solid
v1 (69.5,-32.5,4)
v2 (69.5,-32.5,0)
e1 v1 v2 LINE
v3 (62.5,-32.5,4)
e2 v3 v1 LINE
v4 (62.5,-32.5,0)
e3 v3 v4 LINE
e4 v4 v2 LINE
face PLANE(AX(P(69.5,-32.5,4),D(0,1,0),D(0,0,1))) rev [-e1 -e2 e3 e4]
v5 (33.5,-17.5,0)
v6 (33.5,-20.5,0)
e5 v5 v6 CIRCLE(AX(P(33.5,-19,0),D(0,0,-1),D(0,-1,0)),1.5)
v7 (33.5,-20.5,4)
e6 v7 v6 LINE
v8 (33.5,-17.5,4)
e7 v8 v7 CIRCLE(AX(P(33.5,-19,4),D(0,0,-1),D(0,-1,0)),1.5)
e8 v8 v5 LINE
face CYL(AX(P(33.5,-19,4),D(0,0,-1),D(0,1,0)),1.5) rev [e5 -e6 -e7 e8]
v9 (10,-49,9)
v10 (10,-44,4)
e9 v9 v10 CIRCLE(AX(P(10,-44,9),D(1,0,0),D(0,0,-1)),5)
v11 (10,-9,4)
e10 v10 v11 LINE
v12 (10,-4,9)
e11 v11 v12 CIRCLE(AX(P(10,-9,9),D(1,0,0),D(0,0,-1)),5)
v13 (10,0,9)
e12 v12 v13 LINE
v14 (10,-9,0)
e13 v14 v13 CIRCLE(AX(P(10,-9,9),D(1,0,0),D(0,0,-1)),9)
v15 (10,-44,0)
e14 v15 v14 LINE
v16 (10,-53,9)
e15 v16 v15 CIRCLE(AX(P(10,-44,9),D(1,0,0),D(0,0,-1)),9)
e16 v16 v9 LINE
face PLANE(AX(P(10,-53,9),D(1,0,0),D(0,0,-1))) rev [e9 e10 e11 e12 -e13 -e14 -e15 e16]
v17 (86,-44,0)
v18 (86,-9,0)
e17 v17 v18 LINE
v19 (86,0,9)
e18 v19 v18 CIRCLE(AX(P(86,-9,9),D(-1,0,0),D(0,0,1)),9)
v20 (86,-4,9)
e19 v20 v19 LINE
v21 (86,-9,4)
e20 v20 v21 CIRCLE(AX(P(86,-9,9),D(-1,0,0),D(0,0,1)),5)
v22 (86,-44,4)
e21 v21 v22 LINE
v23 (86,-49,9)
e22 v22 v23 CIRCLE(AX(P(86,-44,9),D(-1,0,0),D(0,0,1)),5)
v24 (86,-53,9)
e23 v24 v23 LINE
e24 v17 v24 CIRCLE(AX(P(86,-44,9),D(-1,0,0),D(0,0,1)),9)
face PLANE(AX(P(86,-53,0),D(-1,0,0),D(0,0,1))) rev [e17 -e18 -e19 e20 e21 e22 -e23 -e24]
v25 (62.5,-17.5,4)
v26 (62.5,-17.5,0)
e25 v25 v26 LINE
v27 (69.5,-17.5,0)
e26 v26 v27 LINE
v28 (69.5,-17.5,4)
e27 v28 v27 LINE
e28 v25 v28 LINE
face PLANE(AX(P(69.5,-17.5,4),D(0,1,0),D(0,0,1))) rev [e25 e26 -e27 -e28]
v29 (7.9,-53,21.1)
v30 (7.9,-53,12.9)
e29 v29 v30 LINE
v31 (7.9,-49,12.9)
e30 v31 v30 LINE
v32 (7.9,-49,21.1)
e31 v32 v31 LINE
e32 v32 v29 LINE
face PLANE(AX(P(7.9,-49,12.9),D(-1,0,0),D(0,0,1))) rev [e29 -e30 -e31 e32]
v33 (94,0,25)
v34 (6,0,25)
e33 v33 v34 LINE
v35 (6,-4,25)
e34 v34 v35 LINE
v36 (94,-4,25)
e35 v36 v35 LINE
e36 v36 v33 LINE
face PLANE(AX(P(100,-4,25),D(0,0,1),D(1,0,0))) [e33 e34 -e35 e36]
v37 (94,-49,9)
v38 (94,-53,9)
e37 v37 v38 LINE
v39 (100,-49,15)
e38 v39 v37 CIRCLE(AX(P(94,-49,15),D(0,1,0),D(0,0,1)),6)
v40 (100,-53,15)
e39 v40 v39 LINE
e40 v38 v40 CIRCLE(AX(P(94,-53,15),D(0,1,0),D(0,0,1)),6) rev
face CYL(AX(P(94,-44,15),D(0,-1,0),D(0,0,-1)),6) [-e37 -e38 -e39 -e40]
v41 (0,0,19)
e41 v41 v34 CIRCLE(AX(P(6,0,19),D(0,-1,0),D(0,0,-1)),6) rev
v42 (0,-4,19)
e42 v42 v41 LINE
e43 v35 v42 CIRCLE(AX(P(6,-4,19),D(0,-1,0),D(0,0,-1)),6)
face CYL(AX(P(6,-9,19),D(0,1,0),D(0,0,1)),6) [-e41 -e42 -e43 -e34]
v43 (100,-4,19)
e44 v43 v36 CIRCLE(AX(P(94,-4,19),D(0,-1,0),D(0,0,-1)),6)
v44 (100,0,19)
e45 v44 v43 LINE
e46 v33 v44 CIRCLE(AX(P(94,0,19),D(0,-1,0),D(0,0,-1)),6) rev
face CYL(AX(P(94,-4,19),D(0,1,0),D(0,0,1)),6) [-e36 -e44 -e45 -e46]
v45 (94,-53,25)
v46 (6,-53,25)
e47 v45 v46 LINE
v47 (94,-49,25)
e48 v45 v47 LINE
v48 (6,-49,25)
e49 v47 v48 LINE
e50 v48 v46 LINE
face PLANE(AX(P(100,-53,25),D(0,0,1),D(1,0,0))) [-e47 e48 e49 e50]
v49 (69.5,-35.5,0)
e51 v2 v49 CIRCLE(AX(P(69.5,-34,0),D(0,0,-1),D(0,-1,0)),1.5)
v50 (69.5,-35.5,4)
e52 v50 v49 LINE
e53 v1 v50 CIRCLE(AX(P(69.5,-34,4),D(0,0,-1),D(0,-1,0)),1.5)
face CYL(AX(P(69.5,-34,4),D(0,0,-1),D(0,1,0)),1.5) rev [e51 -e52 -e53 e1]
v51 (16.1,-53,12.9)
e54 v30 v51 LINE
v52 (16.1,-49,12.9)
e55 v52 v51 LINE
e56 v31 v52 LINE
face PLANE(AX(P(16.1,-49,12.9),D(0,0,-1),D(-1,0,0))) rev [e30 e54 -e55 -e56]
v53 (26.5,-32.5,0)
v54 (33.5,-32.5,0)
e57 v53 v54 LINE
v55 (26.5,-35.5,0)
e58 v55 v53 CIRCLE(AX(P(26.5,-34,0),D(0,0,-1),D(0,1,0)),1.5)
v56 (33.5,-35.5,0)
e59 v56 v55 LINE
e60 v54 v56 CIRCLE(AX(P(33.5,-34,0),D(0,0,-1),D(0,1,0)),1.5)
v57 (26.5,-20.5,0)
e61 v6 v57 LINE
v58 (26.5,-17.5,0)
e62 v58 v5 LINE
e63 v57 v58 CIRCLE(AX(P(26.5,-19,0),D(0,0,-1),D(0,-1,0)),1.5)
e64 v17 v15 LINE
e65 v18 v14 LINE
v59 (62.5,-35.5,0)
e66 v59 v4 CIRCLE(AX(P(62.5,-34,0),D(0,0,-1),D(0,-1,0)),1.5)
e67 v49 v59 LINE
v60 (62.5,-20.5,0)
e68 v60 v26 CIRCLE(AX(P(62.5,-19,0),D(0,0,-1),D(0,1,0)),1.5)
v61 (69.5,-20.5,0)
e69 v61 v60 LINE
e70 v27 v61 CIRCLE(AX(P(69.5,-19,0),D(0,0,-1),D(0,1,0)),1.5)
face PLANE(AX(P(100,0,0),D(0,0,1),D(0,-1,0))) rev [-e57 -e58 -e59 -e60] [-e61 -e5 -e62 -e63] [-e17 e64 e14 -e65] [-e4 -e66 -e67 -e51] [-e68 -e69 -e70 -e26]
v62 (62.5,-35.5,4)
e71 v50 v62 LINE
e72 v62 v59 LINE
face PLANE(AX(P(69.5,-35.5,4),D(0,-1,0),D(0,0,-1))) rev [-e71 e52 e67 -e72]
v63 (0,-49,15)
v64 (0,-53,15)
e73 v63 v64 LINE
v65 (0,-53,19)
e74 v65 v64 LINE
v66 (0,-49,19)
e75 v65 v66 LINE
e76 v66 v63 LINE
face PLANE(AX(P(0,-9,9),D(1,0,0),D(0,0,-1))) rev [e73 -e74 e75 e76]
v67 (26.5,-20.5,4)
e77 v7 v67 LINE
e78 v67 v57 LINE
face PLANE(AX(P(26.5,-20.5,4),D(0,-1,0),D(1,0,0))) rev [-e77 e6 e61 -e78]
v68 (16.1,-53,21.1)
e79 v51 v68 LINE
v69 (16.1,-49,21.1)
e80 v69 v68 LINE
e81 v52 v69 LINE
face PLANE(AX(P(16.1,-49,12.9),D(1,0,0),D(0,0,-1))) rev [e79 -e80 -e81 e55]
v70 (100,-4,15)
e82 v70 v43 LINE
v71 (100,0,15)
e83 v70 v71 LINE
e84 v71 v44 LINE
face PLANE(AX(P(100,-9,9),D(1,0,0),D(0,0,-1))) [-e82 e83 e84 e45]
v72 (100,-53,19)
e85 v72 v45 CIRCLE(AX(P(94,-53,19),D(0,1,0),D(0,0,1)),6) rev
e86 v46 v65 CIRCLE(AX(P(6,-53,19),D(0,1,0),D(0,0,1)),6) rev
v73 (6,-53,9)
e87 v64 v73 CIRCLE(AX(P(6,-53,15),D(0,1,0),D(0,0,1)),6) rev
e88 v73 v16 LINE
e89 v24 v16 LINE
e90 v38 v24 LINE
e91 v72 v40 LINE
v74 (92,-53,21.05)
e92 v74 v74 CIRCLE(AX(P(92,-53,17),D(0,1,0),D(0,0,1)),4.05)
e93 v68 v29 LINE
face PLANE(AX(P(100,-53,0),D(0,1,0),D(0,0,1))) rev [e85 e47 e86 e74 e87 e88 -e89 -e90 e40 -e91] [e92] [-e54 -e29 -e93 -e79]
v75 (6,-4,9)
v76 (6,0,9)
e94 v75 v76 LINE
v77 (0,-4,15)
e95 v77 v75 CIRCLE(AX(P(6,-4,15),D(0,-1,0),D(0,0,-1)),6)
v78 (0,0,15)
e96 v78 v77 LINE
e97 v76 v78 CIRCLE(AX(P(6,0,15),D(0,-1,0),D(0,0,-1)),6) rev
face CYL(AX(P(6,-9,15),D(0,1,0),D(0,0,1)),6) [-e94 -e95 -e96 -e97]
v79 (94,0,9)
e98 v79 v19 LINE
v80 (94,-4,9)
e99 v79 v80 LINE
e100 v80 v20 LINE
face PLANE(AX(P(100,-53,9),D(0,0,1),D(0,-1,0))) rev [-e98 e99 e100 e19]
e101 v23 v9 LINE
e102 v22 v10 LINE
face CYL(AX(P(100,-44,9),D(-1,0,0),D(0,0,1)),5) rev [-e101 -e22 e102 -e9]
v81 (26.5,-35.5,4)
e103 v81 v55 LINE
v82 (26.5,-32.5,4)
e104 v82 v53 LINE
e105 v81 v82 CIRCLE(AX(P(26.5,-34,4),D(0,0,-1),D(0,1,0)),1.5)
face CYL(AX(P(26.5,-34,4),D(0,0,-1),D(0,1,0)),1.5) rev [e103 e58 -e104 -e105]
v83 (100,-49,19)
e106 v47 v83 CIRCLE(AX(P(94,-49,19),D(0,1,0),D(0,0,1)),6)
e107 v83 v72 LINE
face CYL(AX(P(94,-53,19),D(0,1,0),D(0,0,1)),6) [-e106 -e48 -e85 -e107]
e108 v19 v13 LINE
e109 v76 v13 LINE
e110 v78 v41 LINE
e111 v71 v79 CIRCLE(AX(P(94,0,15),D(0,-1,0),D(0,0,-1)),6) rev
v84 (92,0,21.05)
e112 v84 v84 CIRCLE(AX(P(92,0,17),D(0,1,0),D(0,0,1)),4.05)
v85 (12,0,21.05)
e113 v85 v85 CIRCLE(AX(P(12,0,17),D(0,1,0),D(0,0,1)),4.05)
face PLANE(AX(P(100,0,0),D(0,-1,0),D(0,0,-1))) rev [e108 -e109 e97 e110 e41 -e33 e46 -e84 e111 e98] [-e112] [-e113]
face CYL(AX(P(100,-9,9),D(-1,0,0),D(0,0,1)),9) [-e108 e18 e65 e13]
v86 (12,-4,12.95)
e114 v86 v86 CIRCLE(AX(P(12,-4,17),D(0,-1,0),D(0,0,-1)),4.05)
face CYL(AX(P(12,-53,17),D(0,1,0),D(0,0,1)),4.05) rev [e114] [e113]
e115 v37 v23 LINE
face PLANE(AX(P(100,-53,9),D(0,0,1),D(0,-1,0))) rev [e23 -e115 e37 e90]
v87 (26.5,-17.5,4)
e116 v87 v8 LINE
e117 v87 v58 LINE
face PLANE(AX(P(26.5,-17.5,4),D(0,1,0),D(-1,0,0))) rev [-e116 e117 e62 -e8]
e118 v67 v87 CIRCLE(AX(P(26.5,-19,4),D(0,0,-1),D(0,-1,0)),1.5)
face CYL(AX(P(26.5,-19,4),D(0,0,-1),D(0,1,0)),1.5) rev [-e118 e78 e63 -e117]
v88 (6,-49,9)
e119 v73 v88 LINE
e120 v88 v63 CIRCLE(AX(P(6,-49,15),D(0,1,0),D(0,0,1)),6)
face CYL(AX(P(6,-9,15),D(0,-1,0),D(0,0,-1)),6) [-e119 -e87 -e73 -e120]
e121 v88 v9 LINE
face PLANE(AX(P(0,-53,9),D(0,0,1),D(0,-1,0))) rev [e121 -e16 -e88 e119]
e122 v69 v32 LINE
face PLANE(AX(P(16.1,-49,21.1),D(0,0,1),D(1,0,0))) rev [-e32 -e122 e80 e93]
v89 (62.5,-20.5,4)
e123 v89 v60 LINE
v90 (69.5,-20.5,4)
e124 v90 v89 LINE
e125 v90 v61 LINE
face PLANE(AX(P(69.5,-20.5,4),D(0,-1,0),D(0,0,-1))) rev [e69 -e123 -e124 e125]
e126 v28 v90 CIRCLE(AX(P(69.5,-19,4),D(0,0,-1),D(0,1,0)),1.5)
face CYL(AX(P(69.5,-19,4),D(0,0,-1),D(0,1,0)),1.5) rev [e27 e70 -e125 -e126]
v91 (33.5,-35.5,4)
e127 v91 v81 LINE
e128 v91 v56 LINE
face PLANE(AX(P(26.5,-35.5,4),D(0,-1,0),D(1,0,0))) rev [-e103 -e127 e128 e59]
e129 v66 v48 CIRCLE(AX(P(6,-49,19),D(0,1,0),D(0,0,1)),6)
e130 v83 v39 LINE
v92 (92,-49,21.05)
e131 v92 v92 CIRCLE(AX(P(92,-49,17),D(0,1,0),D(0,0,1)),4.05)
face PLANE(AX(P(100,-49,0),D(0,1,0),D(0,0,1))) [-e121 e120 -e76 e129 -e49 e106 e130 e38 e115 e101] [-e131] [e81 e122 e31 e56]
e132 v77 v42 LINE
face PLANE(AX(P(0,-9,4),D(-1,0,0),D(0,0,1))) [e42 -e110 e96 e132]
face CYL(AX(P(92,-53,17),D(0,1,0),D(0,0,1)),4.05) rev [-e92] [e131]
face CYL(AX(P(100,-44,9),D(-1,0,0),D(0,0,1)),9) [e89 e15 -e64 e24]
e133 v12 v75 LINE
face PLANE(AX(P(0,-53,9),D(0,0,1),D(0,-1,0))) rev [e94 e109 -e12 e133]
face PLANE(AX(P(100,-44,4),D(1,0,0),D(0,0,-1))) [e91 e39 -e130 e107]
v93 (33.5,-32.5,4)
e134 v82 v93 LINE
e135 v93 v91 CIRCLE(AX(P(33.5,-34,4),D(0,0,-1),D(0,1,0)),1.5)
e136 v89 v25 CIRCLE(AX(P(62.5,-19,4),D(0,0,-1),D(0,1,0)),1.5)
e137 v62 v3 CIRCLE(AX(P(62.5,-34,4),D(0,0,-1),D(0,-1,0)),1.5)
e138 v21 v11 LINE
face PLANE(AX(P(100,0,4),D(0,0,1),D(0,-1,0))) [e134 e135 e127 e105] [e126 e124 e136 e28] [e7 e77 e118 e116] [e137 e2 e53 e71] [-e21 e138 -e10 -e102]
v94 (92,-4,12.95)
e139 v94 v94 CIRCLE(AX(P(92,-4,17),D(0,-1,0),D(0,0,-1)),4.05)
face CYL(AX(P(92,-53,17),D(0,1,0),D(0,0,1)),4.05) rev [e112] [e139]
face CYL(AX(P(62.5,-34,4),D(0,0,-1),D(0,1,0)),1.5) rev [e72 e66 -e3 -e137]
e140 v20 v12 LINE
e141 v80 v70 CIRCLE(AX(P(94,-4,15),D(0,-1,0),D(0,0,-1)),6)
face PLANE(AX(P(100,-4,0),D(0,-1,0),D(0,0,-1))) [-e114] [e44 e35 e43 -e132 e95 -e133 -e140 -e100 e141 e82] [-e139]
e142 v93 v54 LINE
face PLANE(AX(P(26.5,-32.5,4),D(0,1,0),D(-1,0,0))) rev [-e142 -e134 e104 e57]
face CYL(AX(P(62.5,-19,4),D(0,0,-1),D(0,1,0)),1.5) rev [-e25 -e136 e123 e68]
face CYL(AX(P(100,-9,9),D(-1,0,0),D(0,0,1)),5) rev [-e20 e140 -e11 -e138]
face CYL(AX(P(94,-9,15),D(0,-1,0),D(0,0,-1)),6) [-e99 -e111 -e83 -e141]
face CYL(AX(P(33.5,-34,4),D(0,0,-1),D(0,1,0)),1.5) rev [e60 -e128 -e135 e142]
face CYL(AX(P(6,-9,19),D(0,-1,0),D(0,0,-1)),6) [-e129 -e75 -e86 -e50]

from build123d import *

# Parameters (mm, degrees)
SM_BASE_FLANGE_1_DEPTH = 100
SKETCH_4_R             = 4.05
CUT_EXTRUDE_1_DEPTH    = 116.905133622
SKETCH_5_W             = 10
SKETCH_5_H             = 9
SKETCH_5_W_2           = 14
CUT_EXTRUDE_2_DEPTH    = 116.905133622
FILLET_1_R             = 6
SKETCH_7_W             = 8.2
SKETCH_7_H             = 8.2
CUT_EXTRUDE_4_DEPTH    = 4
CUT_EXTRUDE_5_DEPTH    = 4


# Sheet-metal steps are written as plain solids
with BuildPart() as part:
    # Sketch 1 → Базовая кромка1 (new body)
    with BuildSketch(Plane(origin=(0, 0, 0), x_dir=(0, 0, -1), z_dir=(1, 0, 0))):
        with BuildLine():
            Line((-25, -53), (-9, -53))
            ThreePointArc((-9, -53), (-2.636038969, -50.363961031), (0, -44))
            Line((0, -44), (0, -9))
            ThreePointArc((0, -9), (-2.636038969, -2.636038969), (-9, 0))
            Line((-9, 0), (-25, 0))
            Line((-25, 0), (-25, -4))
            Line((-25, -4), (-9, -4))
            ThreePointArc((-9, -4), (-5.464466094, -5.464466094), (-4, -9))
            Line((-4, -9), (-4, -44))
            ThreePointArc((-4, -44), (-5.464466094, -47.535533906), (-9, -49))
            Line((-9, -49), (-25, -49))
            Line((-25, -49), (-25, -53))
        make_face()
    extrude(amount=SM_BASE_FLANGE_1_DEPTH)

    # Эскиз4 → Вырез-Вытянуть1 (cut, through all)
    with BuildSketch(Plane(origin=(0, 0, 0), x_dir=(1, 0, 0), z_dir=(0, 1, 0))):
        with Locations(Location((12, -17, 0), (0, 0, 270))):
            Circle(SKETCH_4_R)
        with Locations(Location((92, -17, 0), (0, 0, 270))):
            Circle(SKETCH_4_R)
    extrude(amount=-CUT_EXTRUDE_1_DEPTH, mode=Mode.SUBTRACT)

    # Эскиз5 → Вырез-Вытянуть2 (cut, through all)
    with BuildSketch(Plane(origin=(0, 0, 0), x_dir=(1, 0, 0), z_dir=(0, 1, 0))):
        with Locations((5, -4.5)):
            Rectangle(SKETCH_5_W, SKETCH_5_H)
        with Locations((93, -4.5)):
            Rectangle(SKETCH_5_W_2, SKETCH_5_H)
    extrude(amount=-CUT_EXTRUDE_2_DEPTH, mode=Mode.SUBTRACT)

    # Скругление1
    fillet_1_edges = [part.edges().sort_by_distance(p)[0] for p in [
        (0, -51, 25),
        (0, -2, 25),
        (100, -51, 25),
        (0, -2, 9),
        (100, -2, 9),
        (0, -51, 9),
        (100, -51, 9),
        (100, -2, 25),
    ]]
    fillet(fillet_1_edges, radius=FILLET_1_R)

    # Эскиз7 → Вырез-Вытянуть4 (cut)
    with BuildSketch(Plane.XZ.offset(53)):
        with Locations((12, 17)):
            Rectangle(SKETCH_7_W, SKETCH_7_H)
    extrude(amount=-CUT_EXTRUDE_4_DEPTH, mode=Mode.SUBTRACT)

    # Эскиз8 → Вырез-Вытянуть5 (cut)
    with BuildSketch(Plane(origin=(0, 0, 0), x_dir=(-1, 0, 0), z_dir=(0, 0, -1))):
        with BuildLine():
            Line((-69.5, -17.5), (-62.5, -17.5))
            ThreePointArc((-62.5, -17.5), (-61, -19), (-62.5, -20.5))
            Line((-62.5, -20.5), (-69.5, -20.5))
            ThreePointArc((-69.5, -20.5), (-71, -19), (-69.5, -17.5))
        make_face()
        with BuildLine():
            Line((-26.5, -17.5), (-33.5, -17.5))
            ThreePointArc((-33.5, -17.5), (-35, -19), (-33.5, -20.5))
            Line((-33.5, -20.5), (-26.5, -20.5))
            ThreePointArc((-26.5, -20.5), (-25, -19), (-26.5, -17.5))
        make_face()
        with BuildLine():
            Line((-26.5, -35.5), (-33.5, -35.5))
            ThreePointArc((-33.5, -35.5), (-35, -34), (-33.5, -32.5))
            Line((-33.5, -32.5), (-26.5, -32.5))
            ThreePointArc((-26.5, -32.5), (-25, -34), (-26.5, -35.5))
        make_face()
        with BuildLine():
            Line((-69.5, -35.5), (-62.5, -35.5))
            ThreePointArc((-62.5, -35.5), (-61, -34), (-62.5, -32.5))
            Line((-62.5, -32.5), (-69.5, -32.5))
            ThreePointArc((-69.5, -32.5), (-71, -34), (-69.5, -35.5))
        make_face()
    extrude(amount=-CUT_EXTRUDE_5_DEPTH, mode=Mode.SUBTRACT)


solid = part.part
